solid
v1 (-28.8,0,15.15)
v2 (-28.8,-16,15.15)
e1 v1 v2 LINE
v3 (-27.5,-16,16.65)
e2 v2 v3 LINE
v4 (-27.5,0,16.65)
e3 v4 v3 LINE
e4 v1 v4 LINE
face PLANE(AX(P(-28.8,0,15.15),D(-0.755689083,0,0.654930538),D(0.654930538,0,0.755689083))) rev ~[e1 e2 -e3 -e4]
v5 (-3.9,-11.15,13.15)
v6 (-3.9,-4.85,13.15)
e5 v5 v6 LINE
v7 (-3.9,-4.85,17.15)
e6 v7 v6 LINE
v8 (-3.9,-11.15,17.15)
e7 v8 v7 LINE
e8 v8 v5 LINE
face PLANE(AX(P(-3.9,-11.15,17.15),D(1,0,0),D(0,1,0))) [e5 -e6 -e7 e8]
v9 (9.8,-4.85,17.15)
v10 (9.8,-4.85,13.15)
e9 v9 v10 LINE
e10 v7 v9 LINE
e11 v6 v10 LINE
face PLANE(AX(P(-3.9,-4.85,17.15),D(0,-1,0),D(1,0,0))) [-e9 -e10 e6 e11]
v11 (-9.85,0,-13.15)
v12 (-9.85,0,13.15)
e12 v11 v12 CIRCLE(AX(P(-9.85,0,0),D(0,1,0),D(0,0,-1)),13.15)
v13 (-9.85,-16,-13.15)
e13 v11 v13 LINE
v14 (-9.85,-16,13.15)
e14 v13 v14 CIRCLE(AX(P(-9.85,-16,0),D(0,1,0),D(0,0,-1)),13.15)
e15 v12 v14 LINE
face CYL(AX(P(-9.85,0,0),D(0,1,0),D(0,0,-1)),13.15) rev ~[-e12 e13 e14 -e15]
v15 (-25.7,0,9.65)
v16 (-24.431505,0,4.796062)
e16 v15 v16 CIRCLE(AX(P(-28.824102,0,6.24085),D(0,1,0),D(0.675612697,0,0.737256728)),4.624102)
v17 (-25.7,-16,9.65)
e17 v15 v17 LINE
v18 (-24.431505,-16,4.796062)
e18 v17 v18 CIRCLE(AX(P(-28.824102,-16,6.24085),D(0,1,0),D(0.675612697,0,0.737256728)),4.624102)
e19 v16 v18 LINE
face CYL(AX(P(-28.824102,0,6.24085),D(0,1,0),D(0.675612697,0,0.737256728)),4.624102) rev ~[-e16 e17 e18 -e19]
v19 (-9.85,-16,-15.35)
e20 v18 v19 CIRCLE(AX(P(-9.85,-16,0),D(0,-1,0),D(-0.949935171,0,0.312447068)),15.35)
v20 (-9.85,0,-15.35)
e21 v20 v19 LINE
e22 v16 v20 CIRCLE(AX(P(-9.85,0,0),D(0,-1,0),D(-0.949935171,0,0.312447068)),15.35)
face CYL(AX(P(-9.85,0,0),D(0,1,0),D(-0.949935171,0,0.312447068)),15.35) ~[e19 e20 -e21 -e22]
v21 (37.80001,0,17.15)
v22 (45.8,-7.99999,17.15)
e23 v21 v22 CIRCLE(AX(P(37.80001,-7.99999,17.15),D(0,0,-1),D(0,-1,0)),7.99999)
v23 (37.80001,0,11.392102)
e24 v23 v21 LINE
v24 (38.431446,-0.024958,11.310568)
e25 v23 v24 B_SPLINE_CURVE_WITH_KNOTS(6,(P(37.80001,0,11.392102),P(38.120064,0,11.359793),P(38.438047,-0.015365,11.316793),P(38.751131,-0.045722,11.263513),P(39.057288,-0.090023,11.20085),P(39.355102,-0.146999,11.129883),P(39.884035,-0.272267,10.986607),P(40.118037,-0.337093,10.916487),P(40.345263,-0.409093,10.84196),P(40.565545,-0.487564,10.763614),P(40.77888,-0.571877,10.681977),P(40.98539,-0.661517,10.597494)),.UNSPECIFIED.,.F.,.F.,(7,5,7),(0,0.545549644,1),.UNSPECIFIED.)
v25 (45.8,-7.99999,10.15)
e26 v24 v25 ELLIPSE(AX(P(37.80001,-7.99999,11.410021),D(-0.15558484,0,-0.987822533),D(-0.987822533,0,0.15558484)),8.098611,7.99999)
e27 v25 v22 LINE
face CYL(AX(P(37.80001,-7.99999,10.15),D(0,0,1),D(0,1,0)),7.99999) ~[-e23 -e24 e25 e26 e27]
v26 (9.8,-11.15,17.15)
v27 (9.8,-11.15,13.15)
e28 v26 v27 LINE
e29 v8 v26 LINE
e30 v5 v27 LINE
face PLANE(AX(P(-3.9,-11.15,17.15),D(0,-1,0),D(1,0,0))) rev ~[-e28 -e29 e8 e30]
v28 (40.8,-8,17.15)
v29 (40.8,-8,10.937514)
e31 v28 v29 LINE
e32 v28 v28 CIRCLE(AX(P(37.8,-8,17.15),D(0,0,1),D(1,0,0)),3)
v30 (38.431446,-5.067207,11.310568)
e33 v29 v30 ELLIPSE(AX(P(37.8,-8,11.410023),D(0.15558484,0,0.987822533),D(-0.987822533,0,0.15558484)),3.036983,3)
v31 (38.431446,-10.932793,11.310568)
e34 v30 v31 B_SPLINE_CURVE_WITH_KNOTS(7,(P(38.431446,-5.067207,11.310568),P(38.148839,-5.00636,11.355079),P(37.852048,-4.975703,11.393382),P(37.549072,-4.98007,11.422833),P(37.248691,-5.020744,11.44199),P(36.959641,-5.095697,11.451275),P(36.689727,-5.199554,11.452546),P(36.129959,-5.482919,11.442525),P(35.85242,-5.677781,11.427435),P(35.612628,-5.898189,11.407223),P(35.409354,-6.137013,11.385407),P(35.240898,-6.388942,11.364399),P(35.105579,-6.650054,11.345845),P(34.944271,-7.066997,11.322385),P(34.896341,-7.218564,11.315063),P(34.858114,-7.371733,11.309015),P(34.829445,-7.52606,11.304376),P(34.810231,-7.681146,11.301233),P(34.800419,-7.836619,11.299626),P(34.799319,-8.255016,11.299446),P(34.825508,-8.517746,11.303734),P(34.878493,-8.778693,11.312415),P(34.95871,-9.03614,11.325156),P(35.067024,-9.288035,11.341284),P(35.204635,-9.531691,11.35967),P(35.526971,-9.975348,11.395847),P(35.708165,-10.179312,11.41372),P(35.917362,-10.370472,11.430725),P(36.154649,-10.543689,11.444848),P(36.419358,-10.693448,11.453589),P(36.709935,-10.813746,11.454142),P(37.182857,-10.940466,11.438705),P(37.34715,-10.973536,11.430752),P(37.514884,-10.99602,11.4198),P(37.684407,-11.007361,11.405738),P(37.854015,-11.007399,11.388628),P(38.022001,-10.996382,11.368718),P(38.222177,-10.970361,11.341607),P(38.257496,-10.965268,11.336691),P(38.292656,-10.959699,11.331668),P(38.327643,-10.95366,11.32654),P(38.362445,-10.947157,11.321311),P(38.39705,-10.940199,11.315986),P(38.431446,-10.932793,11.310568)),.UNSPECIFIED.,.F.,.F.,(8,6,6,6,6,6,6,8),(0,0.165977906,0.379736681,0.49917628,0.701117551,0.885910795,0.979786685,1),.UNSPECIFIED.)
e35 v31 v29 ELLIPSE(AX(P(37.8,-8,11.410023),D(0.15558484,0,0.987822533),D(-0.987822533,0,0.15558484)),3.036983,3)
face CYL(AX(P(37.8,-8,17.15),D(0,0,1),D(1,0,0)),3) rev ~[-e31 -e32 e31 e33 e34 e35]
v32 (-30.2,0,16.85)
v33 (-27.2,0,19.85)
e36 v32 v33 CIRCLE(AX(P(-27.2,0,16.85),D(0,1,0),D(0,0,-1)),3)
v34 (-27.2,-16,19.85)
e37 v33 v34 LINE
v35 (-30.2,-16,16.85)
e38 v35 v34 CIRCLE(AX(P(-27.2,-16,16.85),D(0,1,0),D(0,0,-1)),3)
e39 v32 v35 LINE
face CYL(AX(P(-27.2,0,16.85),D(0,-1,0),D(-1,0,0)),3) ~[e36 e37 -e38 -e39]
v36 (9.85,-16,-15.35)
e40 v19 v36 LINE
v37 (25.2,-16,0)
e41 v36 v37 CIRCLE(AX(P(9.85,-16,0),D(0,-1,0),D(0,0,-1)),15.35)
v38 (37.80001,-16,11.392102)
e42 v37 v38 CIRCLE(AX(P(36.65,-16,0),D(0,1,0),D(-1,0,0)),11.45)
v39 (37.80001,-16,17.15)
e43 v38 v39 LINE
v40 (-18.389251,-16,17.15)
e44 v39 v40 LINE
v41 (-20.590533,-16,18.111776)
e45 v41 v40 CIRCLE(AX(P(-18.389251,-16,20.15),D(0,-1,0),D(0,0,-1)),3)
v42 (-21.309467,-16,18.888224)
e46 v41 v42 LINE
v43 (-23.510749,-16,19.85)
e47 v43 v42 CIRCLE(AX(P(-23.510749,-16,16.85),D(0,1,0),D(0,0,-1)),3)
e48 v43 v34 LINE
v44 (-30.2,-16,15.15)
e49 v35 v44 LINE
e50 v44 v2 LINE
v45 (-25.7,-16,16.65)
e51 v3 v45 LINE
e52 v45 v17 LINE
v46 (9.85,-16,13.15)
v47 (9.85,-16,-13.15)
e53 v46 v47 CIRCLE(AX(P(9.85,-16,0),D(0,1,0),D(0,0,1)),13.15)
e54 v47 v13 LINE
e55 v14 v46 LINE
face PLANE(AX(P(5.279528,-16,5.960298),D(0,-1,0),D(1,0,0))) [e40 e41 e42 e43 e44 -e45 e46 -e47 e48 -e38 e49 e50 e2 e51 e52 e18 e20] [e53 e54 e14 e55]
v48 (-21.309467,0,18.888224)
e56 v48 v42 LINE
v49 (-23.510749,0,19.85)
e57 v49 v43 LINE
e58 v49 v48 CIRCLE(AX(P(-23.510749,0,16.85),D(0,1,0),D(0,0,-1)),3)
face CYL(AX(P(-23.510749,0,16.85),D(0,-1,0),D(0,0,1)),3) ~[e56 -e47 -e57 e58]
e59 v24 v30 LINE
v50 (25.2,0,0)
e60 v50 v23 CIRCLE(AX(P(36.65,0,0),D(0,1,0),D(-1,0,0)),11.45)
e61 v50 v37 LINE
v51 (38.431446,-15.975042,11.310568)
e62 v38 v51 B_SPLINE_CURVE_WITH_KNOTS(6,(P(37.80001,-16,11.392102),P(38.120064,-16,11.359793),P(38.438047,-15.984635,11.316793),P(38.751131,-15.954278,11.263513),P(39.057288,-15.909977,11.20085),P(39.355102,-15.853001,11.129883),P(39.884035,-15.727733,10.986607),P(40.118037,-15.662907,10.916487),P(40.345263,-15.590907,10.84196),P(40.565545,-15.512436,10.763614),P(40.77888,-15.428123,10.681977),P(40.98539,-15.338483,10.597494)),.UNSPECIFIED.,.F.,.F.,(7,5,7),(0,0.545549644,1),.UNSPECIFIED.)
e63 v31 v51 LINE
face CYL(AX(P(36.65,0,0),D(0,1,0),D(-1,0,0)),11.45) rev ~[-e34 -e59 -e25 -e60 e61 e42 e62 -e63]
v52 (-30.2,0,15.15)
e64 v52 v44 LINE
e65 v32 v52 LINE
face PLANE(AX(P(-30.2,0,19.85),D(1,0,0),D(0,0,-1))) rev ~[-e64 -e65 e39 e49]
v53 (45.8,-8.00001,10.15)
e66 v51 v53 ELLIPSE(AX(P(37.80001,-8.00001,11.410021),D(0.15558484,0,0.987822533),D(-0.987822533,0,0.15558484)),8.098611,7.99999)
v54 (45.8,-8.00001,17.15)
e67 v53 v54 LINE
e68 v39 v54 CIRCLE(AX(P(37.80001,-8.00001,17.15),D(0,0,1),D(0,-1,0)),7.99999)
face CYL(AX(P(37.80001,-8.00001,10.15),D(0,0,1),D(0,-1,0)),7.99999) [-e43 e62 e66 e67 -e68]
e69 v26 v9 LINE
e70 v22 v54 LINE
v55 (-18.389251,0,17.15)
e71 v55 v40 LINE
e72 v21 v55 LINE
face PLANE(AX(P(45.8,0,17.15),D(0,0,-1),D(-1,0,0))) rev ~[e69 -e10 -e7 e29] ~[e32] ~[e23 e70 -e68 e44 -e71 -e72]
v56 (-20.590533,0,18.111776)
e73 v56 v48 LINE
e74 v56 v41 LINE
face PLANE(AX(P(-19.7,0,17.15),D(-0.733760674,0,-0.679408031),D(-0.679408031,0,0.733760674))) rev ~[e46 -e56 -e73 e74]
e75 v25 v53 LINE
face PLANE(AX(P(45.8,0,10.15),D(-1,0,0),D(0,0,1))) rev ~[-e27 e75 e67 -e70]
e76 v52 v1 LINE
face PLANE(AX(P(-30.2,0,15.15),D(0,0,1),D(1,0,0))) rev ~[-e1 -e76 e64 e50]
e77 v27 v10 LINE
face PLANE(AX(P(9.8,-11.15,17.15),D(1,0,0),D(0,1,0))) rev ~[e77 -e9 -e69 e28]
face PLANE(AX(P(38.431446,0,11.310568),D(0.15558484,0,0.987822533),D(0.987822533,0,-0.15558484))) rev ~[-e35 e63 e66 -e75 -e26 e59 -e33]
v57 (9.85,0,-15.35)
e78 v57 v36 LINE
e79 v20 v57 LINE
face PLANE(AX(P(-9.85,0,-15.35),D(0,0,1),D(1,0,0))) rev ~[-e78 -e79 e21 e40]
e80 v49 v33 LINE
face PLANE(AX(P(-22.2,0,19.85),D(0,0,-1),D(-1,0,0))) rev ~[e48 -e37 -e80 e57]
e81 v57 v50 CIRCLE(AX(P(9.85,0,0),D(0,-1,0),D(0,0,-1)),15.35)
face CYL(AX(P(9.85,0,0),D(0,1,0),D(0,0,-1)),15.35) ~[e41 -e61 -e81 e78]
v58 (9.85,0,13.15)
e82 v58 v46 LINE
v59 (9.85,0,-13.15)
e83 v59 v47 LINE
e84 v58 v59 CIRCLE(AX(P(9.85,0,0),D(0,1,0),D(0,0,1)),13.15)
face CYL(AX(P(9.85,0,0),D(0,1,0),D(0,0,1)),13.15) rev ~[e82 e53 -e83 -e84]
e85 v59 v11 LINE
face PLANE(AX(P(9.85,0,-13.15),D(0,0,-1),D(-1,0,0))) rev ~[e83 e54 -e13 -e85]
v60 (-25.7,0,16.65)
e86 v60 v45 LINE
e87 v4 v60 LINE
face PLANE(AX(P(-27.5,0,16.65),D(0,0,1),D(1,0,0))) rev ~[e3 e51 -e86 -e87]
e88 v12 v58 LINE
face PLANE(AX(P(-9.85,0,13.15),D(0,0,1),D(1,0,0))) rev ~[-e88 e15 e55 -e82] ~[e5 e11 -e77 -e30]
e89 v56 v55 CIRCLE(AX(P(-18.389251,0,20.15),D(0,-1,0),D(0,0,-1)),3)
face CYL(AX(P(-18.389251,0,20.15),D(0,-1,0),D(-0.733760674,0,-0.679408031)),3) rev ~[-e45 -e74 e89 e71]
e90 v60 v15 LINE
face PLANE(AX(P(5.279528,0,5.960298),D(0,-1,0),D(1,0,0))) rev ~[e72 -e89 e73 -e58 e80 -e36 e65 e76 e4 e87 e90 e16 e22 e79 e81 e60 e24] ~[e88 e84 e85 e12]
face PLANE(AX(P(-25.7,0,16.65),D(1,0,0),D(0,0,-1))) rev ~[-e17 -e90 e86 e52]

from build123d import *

# Parameters (mm, degrees)
F1_DEPTH = 16
F2_R     = 3
F3_R     = 7.99999
F4_R     = 3
F4_W     = 13.7
F4_H     = 6.3
F5_DEPTH = 10


# Not quite as in the source:
# - a fillet or chamfer is up to 0.001 mm smaller than in the source, because OpenCascade refuses the exact size


with BuildPart() as f1:
    # F0 (on Front) → F1 (new body)
    with BuildSketch(Plane.XZ):
        with BuildLine():
            ThreePointArc((-25.7, 9.65), (-24.3502481093, 7.4100162997), (-24.4315048785, 4.7960624973))
            ThreePointArc((-24.4315048785, 4.7960624973), (-22.2846704688, -9.0000816848), (-9.85, -15.35))
            Line((-9.85, -15.35), (9.85, -15.35))
            ThreePointArc((9.85, -15.35), (20.7040890912, -10.8540890912), (25.2, 0))
            ThreePointArc((25.2, 0), (29.210075991, 8.7034493587), (38.4314464174, 11.3105680079))
            Line((38.4314464174, 11.3105680079), (45.8, 10.15))
            Line((45.8, 10.15), (45.8, 17.15))
            Line((45.8, 17.15), (-19.7, 17.15))
            Line((-19.7, 17.15), (-22.2, 19.85))
            Line((-22.2, 19.85), (-30.2, 19.85))
            Line((-30.2, 19.85), (-30.2, 15.15))
            Line((-30.2, 15.15), (-28.8, 15.15))
            Line((-28.8, 15.15), (-27.5, 16.65))
            Line((-27.5, 16.65), (-25.7, 16.65))
            Line((-25.7, 16.65), (-25.7, 9.65))
        make_face()
        with BuildLine():
            ThreePointArc((-9.85, -13.15), (-23, 0), (-9.85, 13.15))
            Line((-9.85, 13.15), (9.85, 13.15))
            ThreePointArc((9.85, 13.15), (23, 0), (9.85, -13.15))
            Line((9.85, -13.15), (-9.85, -13.15))
        make_face(mode=Mode.SUBTRACT)
    extrude(amount=F1_DEPTH)

    # F2
    f2_edges = [f1.edges().sort_by_distance(p)[0] for p in [
        (-30.2, -8, 19.85),
        (-22.2, -8, 19.85),
        (-19.7, -8, 17.15),
    ]]
    fillet(f2_edges, radius=F2_R)

    # F3 (radius 8 in the source; OpenCascade refuses exactly that, so slightly less here)
    f3_edges = [f1.edges().sort_by_distance(p)[0] for p in [
        (45.8, -16, 13.65),
        (45.8, 0, 13.65),
    ]]
    fillet(f3_edges, radius=F3_R)

    # F4 (on face) → F5 (cut)
    with BuildSketch(Plane.XY.offset(17.15)):
        with Locations((37.8, -8)):
            Circle(F4_R)
        with Locations((2.95, -8)):
            Rectangle(F4_W, F4_H)
    extrude(amount=-F5_DEPTH, mode=Mode.SUBTRACT)


solid = f1.part
